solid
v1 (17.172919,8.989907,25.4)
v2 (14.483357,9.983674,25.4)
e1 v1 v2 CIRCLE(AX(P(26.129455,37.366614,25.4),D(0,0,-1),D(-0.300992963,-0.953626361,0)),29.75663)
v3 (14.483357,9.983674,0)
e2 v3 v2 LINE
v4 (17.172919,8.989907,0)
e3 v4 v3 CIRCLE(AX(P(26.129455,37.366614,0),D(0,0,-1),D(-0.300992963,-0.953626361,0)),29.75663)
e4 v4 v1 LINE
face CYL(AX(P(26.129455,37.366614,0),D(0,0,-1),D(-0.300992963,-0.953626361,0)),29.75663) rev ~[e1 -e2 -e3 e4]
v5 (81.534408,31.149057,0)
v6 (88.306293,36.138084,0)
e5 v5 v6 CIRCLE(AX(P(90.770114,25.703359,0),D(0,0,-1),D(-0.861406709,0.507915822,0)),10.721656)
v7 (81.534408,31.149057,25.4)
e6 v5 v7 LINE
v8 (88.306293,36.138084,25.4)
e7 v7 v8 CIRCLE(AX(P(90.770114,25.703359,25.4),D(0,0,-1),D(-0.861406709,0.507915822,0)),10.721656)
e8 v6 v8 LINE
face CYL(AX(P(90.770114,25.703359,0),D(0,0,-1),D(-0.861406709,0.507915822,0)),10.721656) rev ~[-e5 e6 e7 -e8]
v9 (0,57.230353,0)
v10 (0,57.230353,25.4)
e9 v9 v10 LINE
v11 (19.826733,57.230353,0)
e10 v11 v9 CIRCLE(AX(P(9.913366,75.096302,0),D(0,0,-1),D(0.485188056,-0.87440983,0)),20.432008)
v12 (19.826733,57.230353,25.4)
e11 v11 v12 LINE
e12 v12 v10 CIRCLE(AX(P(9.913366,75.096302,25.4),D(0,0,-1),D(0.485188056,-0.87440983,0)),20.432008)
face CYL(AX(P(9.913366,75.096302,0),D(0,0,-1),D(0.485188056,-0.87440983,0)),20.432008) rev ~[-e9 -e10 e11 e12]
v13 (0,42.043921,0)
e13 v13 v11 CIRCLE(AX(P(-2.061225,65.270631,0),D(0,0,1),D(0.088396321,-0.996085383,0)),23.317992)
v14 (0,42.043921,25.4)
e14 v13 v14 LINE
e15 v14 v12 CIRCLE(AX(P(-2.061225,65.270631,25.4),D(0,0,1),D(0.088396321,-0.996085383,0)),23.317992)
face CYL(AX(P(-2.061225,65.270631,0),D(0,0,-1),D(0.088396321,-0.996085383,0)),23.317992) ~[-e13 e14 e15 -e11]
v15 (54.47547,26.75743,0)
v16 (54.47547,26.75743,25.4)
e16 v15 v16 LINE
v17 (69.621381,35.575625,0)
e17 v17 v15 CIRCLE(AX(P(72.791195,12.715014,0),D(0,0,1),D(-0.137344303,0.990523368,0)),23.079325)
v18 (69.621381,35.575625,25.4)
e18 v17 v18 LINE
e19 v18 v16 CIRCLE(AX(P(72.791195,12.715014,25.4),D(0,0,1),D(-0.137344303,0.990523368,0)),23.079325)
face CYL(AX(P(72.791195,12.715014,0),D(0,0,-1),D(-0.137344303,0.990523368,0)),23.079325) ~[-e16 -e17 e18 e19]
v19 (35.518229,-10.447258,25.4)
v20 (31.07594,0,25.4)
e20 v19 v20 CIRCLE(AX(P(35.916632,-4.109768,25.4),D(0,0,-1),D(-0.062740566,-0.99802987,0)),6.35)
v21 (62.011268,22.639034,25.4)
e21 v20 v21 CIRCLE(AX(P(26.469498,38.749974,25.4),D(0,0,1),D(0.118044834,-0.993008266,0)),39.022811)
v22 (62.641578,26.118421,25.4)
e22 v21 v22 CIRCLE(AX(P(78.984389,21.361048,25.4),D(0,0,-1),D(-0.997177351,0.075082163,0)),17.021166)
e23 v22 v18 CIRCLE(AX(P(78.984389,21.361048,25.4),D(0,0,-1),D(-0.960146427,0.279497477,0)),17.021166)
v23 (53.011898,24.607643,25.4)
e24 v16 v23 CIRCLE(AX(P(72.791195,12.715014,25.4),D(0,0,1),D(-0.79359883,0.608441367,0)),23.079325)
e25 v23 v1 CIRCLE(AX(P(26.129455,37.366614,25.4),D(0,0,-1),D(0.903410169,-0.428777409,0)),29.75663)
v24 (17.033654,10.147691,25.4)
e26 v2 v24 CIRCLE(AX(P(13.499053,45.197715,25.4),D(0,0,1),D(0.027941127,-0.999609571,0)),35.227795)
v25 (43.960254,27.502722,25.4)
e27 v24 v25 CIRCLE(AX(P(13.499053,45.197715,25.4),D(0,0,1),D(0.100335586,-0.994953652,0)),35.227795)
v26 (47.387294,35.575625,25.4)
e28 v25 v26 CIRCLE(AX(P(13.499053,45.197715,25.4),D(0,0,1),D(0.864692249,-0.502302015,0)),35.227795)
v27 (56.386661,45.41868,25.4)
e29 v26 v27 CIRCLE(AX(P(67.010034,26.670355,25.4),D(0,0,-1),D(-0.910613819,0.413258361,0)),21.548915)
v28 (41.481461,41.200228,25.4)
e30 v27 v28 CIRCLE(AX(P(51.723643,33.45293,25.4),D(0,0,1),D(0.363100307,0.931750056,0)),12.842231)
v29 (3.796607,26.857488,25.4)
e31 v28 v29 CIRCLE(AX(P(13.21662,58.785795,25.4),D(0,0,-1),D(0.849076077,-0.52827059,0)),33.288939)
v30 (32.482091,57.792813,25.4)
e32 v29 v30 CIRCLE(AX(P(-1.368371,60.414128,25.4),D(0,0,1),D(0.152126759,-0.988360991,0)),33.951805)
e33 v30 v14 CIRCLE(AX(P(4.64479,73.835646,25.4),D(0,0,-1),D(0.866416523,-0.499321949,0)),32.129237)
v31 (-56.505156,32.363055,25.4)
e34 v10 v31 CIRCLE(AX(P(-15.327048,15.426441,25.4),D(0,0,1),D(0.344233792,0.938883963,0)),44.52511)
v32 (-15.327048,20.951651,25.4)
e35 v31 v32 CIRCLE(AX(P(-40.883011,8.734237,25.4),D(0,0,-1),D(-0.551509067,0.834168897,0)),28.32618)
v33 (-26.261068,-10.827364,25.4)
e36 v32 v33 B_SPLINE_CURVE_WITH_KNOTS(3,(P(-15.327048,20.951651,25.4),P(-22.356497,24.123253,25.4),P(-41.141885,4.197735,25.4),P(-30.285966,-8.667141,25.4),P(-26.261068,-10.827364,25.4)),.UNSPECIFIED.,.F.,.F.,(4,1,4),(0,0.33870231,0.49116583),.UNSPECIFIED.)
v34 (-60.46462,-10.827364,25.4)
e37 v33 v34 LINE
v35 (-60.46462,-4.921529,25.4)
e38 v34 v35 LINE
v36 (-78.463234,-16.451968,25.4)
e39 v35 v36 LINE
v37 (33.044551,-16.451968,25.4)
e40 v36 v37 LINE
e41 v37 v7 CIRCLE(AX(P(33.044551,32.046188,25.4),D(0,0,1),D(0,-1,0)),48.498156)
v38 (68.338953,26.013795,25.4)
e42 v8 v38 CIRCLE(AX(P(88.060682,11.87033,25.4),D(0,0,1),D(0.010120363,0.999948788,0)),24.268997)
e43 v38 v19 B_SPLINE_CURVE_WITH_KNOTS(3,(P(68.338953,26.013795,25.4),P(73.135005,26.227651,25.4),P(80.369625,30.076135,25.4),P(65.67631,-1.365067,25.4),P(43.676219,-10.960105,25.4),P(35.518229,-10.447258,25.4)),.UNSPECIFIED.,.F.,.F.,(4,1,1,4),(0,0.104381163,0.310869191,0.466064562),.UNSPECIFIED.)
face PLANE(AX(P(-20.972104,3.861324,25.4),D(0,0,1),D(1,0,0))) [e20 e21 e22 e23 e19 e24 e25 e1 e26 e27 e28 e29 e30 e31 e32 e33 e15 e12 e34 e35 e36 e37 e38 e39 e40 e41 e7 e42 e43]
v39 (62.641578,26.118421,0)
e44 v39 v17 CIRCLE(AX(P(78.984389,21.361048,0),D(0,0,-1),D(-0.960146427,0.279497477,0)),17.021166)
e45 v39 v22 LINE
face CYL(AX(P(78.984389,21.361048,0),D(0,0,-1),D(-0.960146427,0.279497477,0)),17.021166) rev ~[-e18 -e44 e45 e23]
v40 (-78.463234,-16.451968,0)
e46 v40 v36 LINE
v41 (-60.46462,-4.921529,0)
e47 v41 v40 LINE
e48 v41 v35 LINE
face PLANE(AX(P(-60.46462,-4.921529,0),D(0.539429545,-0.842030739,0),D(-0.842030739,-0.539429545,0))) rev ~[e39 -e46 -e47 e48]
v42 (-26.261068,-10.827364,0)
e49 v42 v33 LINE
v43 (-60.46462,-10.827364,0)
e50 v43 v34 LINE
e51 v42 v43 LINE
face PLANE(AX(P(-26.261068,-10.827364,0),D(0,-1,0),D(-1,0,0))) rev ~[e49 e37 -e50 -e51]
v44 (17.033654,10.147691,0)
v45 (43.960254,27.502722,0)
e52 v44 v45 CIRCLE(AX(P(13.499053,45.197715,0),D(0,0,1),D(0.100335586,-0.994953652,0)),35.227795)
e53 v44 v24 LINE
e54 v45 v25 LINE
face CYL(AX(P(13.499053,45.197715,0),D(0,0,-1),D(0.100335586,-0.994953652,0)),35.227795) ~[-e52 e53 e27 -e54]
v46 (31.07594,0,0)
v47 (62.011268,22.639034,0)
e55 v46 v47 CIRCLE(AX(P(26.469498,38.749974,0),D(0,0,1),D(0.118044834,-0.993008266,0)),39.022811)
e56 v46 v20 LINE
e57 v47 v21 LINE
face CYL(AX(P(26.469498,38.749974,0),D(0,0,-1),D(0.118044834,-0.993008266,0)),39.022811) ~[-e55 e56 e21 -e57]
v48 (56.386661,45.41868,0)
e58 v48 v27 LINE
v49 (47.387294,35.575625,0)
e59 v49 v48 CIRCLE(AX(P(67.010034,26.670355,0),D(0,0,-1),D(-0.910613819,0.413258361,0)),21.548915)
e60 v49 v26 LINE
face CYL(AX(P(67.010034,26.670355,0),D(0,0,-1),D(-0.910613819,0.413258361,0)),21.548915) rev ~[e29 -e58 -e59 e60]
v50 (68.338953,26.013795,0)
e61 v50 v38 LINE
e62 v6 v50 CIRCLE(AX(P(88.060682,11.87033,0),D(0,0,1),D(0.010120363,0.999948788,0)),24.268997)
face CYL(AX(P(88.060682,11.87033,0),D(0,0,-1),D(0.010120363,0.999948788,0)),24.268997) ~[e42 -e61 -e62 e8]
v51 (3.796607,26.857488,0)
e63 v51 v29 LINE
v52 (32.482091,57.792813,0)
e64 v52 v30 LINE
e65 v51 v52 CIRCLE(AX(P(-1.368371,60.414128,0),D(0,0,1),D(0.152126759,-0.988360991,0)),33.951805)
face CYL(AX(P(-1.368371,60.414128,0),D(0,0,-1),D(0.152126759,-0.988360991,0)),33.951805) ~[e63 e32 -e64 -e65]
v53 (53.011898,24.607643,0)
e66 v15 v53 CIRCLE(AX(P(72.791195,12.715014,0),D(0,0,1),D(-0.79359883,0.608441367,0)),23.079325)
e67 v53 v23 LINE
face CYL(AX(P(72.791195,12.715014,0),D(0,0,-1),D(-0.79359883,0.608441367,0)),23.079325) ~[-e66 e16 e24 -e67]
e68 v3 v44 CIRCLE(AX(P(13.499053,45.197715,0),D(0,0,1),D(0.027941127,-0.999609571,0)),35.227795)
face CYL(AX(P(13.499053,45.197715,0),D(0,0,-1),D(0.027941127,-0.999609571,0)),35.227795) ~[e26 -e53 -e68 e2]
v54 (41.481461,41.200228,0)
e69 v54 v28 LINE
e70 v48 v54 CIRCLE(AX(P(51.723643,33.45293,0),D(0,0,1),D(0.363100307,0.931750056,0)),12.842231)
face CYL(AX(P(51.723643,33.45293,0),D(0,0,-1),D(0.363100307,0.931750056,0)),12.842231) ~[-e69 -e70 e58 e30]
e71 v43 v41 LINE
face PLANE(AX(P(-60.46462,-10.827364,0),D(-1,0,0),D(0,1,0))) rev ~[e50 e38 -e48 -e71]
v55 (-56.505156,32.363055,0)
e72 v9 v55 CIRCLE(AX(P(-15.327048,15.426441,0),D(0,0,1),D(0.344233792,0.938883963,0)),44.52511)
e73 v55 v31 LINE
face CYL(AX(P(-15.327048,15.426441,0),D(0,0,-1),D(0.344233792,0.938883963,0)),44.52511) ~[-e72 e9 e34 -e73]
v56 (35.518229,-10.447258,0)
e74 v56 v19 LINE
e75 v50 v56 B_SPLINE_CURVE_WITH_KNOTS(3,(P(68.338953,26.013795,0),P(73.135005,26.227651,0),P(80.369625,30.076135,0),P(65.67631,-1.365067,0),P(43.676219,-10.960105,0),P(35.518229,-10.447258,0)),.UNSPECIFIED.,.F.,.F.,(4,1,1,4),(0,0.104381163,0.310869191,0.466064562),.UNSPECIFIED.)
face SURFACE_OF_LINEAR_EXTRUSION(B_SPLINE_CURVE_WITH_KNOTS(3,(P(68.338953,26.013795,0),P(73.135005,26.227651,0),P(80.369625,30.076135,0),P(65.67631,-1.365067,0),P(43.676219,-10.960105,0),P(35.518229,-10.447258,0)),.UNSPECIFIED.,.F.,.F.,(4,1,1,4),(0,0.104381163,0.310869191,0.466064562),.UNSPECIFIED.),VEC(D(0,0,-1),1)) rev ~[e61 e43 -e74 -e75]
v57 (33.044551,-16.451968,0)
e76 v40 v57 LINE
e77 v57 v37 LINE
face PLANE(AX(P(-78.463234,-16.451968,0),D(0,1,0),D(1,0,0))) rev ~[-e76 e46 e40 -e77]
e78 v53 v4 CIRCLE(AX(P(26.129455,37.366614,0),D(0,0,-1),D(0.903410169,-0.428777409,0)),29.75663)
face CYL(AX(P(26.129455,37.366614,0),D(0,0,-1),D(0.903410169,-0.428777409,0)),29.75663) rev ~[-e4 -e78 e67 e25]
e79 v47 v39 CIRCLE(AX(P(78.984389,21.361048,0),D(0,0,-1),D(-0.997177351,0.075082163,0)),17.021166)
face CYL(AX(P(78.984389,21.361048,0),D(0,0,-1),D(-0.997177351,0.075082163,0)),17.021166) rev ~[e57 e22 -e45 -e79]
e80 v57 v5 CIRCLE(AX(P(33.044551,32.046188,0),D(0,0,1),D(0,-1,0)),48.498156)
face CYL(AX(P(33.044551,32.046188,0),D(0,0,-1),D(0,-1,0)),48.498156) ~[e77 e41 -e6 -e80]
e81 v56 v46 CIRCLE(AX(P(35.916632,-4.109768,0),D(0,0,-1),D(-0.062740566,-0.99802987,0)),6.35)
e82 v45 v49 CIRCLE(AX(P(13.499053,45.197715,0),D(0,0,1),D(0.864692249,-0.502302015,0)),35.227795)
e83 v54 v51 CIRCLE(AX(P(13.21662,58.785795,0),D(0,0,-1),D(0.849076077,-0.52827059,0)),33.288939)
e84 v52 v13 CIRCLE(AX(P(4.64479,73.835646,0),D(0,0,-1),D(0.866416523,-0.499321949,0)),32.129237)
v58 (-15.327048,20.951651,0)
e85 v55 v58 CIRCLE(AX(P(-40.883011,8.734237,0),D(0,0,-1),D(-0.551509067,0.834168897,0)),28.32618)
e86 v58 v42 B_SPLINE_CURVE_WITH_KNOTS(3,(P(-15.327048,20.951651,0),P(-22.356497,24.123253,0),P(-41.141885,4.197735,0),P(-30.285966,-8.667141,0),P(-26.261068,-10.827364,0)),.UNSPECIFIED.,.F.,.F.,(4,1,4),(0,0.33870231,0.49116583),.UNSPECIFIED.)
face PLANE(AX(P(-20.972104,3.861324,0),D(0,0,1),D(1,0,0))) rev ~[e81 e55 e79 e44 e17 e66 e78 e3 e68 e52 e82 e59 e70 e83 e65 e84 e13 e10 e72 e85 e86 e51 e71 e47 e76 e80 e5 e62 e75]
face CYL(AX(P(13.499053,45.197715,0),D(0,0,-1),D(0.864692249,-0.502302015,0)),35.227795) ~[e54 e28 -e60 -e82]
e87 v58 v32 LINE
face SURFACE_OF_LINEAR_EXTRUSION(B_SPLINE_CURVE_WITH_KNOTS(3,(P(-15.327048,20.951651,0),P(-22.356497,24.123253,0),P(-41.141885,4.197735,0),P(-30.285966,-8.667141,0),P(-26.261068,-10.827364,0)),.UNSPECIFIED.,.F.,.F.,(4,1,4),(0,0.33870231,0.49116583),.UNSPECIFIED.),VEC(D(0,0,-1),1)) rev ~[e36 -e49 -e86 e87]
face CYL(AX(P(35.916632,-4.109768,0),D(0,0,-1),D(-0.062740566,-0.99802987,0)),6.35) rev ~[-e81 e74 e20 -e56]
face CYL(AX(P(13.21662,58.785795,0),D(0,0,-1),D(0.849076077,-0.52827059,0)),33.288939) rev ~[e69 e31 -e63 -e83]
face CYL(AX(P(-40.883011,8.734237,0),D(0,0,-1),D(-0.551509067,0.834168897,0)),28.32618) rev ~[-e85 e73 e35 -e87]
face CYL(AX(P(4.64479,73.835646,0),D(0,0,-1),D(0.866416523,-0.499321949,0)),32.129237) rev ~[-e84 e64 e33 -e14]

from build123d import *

# Parameters (mm, degrees)
F1_DEPTH = 25.4


with BuildPart() as f1:
    # F0 (on Top) → F1 (new body)
    with BuildSketch(Plane.XY):
        with BuildLine():
            add(Edge.make_bspline(
                [(-26.2610681984, -10.8273644), (-22.3250154222, -12.9399033802), (-6.7541943176, -14.1664240285), (-7.861061568, 17.5830890308), (-15.3270475566, 20.9516510367)],
                knots=[0.4911658302, 0.4911658302, 0.4911658302, 0.4911658302, 0.6402639099, 1, 1, 1, 1], degree=3))
            add(Edge.make_bspline(
                [(-15.3270475566, 20.9516510367), (-22.3564971203, 24.123253121), (-41.1418845104, 4.1977350509), (-30.2859655215, -8.6671412095), (-26.2610681984, -10.8273644)],
                knots=[0, 0, 0, 0, 0.3387023101, 0.4911658302, 0.4911658302, 0.4911658302, 0.4911658302], degree=3))
        make_face()
        with BuildLine():
            add(Edge.make_bspline(
                [(35.5182294418, -10.447258051), (31.9129186826, -10.220612291), (23.1955555043, -7.2820451281), (18.0529932429, 2.8715139484), (17.1729191086, 8.9899072036)],
                knots=[0.4660645619, 0.4660645619, 0.4660645619, 0.4660645619, 0.5346510085, 0.6442786993, 0.6442786993, 0.6442786993, 0.6442786993], degree=3))
            ThreePointArc((35.5182294418, -10.447258051), (30.0729748302, -6.5945561838), (31.0759395361, 0))
            ThreePointArc((31.0759395361, 0), (49.5151308357, 7.2590451113), (62.0112679899, 22.6390343159))
            ThreePointArc((62.0112679899, 22.6390343159), (62.2358256831, 24.395139963), (62.6415775007, 26.1184213282))
            add(Edge.make_bspline(
                [(54.4754700357, 26.7574300255), (57.3752815642, 26.5086516013), (60.1433747449, 26.2647226636), (62.6415775007, 26.1184213282)],
                knots=[0.9219128776, 0.9219128776, 0.9219128776, 0.9219128776, 0.9641346796, 0.9641346796, 0.9641346796, 0.9641346796], degree=3))
            ThreePointArc((54.4754700357, 26.7574300255), (53.7133787969, 25.7031684966), (53.0118979514, 24.6076434851))
            ThreePointArc((53.0118979514, 24.6076434851), (38.016967787, 10.0876095615), (17.1729191086, 8.9899072036))
        make_face()
        with BuildLine():
            ThreePointArc((-56.50515552, 32.3630547615), (-33.3182753375, 36.0316218628), (-15.3270475566, 20.9516510367))
            add(Edge.make_bspline(
                [(-26.2610681984, -10.8273644), (-22.3250154222, -12.9399033802), (-6.7541943176, -14.1664240285), (-7.861061568, 17.5830890308), (-15.3270475566, 20.9516510367)],
                knots=[0.4911658302, 0.4911658302, 0.4911658302, 0.4911658302, 0.6402639099, 1, 1, 1, 1], degree=3))
            Line((-26.2610681984, -10.8273644), (-60.464620338, -10.8273644))
            Line((-60.464620338, -10.8273644), (-60.464620338, -4.9215289764))
            Line((-60.464620338, -4.9215289764), (-78.4632340074, -16.4519678801))
            Line((-78.4632340074, -16.4519678801), (-14.9052012712, -16.4519678801))
            Line((-14.9052012712, -16.4519678801), (33.0445505679, -16.4519678801))
            ThreePointArc((33.0445505679, -16.4519678801), (67.0192612888, -2.5629170358), (81.5344079335, 31.1490573918))
            ThreePointArc((81.5344079335, 31.1490573918), (84.4106855525, 34.3353672495), (88.3062928915, 36.1380837858))
            ThreePointArc((88.3062928915, 36.1380837858), (77.0854781582, 33.5158631028), (68.3389529586, 26.0137952864))
            add(Edge.make_bspline(
                [(68.3389529586, 26.0137952864), (73.13500471, 26.2276507448), (80.3696253608, 30.0761350301), (65.6763095341, -1.3650666606), (43.6762193769, -10.9601053344), (35.5182294418, -10.447258051)],
                knots=[0, 0, 0, 0, 0.1043811632, 0.3108691907, 0.4660645619, 0.4660645619, 0.4660645619, 0.4660645619], degree=3))
            add(Edge.make_bspline(
                [(35.5182294418, -10.447258051), (31.9129186826, -10.220612291), (23.1955555043, -7.2820451281), (18.0529932429, 2.8715139484), (17.1729191086, 8.9899072036)],
                knots=[0.4660645619, 0.4660645619, 0.4660645619, 0.4660645619, 0.5346510085, 0.6442786993, 0.6442786993, 0.6442786993, 0.6442786993], degree=3))
            ThreePointArc((17.1729191086, 8.9899072036), (15.8161613784, 9.4543765839), (14.4833568484, 9.9836736917))
            ThreePointArc((14.4833568484, 9.9836736917), (15.7599932562, 10.0425488454), (17.0336540583, 10.1476914274))
            add(Edge.make_bspline(
                [(17.0336540583, 10.1476914274), (16.5524367293, 15.1345962527), (19.2361600934, 26.9166935874), (34.5605586177, 27.9160004318), (43.9602541666, 27.5027224979)],
                knots=[0.6512070875, 0.6512070875, 0.6512070875, 0.6512070875, 0.7409649976, 0.872432959, 0.872432959, 0.872432959, 0.872432959], degree=3))
            ThreePointArc((43.9602541666, 27.5027224979), (45.9259805238, 31.4321090753), (47.3872944713, 35.5756245553))
            ThreePointArc((47.3872944713, 35.5756245553), (51.1063153143, 41.2109006624), (56.3866607845, 45.4186797142))
            ThreePointArc((56.3866607845, 45.4186797142), (48.2264153253, 45.809802792), (41.481461376, 41.2002280354))
            ThreePointArc((41.481461376, 41.2002280354), (25.0576689955, 27.6740129875), (3.7966074888, 26.8574878573))
            ThreePointArc((3.7966074888, 26.8574878573), (23.5274065425, 37.3289516325), (32.4820913374, 57.7928125858))
            ThreePointArc((32.4820913374, 57.7928125858), (18.6619239349, 44.9253049217), (0, 42.0439206064))
            ThreePointArc((0, 42.0439206064), (12.1179065959, 46.7589869992), (19.8267325759, 57.2303533554))
            ThreePointArc((19.8267325759, 57.2303533554), (9.9133662879, 54.6642939776), (0, 57.2303533554))
            ThreePointArc((0, 57.2303533554), (-33.2620682112, 56.1796066262), (-56.50515552, 32.3630547615))
        make_face()
        with BuildLine():
            ThreePointArc((17.0336540583, 10.1476914274), (32.5838091219, 15.5874190212), (43.9602541666, 27.5027224979))
            add(Edge.make_bspline(
                [(17.0336540583, 10.1476914274), (16.5524367293, 15.1345962527), (19.2361600934, 26.9166935874), (34.5605586177, 27.9160004318), (43.9602541666, 27.5027224979)],
                knots=[0.6512070875, 0.6512070875, 0.6512070875, 0.6512070875, 0.7409649976, 0.872432959, 0.872432959, 0.872432959, 0.872432959], degree=3))
        make_face()
        with BuildLine():
            add(Edge.make_bspline(
                [(54.4754700357, 26.7574300255), (57.3752815642, 26.5086516013), (60.1433747449, 26.2647226636), (62.6415775007, 26.1184213282)],
                knots=[0.9219128776, 0.9219128776, 0.9219128776, 0.9219128776, 0.9641346796, 0.9641346796, 0.9641346796, 0.9641346796], degree=3))
            ThreePointArc((62.6415775007, 26.1184213282), (65.2892454144, 31.4686261622), (69.6213813016, 35.5756245553))
            ThreePointArc((69.6213813016, 35.5756245553), (61.1788209316, 32.6601387253), (54.4754700357, 26.7574300255))
        make_face()
    extrude(amount=F1_DEPTH)


solid = f1.part
